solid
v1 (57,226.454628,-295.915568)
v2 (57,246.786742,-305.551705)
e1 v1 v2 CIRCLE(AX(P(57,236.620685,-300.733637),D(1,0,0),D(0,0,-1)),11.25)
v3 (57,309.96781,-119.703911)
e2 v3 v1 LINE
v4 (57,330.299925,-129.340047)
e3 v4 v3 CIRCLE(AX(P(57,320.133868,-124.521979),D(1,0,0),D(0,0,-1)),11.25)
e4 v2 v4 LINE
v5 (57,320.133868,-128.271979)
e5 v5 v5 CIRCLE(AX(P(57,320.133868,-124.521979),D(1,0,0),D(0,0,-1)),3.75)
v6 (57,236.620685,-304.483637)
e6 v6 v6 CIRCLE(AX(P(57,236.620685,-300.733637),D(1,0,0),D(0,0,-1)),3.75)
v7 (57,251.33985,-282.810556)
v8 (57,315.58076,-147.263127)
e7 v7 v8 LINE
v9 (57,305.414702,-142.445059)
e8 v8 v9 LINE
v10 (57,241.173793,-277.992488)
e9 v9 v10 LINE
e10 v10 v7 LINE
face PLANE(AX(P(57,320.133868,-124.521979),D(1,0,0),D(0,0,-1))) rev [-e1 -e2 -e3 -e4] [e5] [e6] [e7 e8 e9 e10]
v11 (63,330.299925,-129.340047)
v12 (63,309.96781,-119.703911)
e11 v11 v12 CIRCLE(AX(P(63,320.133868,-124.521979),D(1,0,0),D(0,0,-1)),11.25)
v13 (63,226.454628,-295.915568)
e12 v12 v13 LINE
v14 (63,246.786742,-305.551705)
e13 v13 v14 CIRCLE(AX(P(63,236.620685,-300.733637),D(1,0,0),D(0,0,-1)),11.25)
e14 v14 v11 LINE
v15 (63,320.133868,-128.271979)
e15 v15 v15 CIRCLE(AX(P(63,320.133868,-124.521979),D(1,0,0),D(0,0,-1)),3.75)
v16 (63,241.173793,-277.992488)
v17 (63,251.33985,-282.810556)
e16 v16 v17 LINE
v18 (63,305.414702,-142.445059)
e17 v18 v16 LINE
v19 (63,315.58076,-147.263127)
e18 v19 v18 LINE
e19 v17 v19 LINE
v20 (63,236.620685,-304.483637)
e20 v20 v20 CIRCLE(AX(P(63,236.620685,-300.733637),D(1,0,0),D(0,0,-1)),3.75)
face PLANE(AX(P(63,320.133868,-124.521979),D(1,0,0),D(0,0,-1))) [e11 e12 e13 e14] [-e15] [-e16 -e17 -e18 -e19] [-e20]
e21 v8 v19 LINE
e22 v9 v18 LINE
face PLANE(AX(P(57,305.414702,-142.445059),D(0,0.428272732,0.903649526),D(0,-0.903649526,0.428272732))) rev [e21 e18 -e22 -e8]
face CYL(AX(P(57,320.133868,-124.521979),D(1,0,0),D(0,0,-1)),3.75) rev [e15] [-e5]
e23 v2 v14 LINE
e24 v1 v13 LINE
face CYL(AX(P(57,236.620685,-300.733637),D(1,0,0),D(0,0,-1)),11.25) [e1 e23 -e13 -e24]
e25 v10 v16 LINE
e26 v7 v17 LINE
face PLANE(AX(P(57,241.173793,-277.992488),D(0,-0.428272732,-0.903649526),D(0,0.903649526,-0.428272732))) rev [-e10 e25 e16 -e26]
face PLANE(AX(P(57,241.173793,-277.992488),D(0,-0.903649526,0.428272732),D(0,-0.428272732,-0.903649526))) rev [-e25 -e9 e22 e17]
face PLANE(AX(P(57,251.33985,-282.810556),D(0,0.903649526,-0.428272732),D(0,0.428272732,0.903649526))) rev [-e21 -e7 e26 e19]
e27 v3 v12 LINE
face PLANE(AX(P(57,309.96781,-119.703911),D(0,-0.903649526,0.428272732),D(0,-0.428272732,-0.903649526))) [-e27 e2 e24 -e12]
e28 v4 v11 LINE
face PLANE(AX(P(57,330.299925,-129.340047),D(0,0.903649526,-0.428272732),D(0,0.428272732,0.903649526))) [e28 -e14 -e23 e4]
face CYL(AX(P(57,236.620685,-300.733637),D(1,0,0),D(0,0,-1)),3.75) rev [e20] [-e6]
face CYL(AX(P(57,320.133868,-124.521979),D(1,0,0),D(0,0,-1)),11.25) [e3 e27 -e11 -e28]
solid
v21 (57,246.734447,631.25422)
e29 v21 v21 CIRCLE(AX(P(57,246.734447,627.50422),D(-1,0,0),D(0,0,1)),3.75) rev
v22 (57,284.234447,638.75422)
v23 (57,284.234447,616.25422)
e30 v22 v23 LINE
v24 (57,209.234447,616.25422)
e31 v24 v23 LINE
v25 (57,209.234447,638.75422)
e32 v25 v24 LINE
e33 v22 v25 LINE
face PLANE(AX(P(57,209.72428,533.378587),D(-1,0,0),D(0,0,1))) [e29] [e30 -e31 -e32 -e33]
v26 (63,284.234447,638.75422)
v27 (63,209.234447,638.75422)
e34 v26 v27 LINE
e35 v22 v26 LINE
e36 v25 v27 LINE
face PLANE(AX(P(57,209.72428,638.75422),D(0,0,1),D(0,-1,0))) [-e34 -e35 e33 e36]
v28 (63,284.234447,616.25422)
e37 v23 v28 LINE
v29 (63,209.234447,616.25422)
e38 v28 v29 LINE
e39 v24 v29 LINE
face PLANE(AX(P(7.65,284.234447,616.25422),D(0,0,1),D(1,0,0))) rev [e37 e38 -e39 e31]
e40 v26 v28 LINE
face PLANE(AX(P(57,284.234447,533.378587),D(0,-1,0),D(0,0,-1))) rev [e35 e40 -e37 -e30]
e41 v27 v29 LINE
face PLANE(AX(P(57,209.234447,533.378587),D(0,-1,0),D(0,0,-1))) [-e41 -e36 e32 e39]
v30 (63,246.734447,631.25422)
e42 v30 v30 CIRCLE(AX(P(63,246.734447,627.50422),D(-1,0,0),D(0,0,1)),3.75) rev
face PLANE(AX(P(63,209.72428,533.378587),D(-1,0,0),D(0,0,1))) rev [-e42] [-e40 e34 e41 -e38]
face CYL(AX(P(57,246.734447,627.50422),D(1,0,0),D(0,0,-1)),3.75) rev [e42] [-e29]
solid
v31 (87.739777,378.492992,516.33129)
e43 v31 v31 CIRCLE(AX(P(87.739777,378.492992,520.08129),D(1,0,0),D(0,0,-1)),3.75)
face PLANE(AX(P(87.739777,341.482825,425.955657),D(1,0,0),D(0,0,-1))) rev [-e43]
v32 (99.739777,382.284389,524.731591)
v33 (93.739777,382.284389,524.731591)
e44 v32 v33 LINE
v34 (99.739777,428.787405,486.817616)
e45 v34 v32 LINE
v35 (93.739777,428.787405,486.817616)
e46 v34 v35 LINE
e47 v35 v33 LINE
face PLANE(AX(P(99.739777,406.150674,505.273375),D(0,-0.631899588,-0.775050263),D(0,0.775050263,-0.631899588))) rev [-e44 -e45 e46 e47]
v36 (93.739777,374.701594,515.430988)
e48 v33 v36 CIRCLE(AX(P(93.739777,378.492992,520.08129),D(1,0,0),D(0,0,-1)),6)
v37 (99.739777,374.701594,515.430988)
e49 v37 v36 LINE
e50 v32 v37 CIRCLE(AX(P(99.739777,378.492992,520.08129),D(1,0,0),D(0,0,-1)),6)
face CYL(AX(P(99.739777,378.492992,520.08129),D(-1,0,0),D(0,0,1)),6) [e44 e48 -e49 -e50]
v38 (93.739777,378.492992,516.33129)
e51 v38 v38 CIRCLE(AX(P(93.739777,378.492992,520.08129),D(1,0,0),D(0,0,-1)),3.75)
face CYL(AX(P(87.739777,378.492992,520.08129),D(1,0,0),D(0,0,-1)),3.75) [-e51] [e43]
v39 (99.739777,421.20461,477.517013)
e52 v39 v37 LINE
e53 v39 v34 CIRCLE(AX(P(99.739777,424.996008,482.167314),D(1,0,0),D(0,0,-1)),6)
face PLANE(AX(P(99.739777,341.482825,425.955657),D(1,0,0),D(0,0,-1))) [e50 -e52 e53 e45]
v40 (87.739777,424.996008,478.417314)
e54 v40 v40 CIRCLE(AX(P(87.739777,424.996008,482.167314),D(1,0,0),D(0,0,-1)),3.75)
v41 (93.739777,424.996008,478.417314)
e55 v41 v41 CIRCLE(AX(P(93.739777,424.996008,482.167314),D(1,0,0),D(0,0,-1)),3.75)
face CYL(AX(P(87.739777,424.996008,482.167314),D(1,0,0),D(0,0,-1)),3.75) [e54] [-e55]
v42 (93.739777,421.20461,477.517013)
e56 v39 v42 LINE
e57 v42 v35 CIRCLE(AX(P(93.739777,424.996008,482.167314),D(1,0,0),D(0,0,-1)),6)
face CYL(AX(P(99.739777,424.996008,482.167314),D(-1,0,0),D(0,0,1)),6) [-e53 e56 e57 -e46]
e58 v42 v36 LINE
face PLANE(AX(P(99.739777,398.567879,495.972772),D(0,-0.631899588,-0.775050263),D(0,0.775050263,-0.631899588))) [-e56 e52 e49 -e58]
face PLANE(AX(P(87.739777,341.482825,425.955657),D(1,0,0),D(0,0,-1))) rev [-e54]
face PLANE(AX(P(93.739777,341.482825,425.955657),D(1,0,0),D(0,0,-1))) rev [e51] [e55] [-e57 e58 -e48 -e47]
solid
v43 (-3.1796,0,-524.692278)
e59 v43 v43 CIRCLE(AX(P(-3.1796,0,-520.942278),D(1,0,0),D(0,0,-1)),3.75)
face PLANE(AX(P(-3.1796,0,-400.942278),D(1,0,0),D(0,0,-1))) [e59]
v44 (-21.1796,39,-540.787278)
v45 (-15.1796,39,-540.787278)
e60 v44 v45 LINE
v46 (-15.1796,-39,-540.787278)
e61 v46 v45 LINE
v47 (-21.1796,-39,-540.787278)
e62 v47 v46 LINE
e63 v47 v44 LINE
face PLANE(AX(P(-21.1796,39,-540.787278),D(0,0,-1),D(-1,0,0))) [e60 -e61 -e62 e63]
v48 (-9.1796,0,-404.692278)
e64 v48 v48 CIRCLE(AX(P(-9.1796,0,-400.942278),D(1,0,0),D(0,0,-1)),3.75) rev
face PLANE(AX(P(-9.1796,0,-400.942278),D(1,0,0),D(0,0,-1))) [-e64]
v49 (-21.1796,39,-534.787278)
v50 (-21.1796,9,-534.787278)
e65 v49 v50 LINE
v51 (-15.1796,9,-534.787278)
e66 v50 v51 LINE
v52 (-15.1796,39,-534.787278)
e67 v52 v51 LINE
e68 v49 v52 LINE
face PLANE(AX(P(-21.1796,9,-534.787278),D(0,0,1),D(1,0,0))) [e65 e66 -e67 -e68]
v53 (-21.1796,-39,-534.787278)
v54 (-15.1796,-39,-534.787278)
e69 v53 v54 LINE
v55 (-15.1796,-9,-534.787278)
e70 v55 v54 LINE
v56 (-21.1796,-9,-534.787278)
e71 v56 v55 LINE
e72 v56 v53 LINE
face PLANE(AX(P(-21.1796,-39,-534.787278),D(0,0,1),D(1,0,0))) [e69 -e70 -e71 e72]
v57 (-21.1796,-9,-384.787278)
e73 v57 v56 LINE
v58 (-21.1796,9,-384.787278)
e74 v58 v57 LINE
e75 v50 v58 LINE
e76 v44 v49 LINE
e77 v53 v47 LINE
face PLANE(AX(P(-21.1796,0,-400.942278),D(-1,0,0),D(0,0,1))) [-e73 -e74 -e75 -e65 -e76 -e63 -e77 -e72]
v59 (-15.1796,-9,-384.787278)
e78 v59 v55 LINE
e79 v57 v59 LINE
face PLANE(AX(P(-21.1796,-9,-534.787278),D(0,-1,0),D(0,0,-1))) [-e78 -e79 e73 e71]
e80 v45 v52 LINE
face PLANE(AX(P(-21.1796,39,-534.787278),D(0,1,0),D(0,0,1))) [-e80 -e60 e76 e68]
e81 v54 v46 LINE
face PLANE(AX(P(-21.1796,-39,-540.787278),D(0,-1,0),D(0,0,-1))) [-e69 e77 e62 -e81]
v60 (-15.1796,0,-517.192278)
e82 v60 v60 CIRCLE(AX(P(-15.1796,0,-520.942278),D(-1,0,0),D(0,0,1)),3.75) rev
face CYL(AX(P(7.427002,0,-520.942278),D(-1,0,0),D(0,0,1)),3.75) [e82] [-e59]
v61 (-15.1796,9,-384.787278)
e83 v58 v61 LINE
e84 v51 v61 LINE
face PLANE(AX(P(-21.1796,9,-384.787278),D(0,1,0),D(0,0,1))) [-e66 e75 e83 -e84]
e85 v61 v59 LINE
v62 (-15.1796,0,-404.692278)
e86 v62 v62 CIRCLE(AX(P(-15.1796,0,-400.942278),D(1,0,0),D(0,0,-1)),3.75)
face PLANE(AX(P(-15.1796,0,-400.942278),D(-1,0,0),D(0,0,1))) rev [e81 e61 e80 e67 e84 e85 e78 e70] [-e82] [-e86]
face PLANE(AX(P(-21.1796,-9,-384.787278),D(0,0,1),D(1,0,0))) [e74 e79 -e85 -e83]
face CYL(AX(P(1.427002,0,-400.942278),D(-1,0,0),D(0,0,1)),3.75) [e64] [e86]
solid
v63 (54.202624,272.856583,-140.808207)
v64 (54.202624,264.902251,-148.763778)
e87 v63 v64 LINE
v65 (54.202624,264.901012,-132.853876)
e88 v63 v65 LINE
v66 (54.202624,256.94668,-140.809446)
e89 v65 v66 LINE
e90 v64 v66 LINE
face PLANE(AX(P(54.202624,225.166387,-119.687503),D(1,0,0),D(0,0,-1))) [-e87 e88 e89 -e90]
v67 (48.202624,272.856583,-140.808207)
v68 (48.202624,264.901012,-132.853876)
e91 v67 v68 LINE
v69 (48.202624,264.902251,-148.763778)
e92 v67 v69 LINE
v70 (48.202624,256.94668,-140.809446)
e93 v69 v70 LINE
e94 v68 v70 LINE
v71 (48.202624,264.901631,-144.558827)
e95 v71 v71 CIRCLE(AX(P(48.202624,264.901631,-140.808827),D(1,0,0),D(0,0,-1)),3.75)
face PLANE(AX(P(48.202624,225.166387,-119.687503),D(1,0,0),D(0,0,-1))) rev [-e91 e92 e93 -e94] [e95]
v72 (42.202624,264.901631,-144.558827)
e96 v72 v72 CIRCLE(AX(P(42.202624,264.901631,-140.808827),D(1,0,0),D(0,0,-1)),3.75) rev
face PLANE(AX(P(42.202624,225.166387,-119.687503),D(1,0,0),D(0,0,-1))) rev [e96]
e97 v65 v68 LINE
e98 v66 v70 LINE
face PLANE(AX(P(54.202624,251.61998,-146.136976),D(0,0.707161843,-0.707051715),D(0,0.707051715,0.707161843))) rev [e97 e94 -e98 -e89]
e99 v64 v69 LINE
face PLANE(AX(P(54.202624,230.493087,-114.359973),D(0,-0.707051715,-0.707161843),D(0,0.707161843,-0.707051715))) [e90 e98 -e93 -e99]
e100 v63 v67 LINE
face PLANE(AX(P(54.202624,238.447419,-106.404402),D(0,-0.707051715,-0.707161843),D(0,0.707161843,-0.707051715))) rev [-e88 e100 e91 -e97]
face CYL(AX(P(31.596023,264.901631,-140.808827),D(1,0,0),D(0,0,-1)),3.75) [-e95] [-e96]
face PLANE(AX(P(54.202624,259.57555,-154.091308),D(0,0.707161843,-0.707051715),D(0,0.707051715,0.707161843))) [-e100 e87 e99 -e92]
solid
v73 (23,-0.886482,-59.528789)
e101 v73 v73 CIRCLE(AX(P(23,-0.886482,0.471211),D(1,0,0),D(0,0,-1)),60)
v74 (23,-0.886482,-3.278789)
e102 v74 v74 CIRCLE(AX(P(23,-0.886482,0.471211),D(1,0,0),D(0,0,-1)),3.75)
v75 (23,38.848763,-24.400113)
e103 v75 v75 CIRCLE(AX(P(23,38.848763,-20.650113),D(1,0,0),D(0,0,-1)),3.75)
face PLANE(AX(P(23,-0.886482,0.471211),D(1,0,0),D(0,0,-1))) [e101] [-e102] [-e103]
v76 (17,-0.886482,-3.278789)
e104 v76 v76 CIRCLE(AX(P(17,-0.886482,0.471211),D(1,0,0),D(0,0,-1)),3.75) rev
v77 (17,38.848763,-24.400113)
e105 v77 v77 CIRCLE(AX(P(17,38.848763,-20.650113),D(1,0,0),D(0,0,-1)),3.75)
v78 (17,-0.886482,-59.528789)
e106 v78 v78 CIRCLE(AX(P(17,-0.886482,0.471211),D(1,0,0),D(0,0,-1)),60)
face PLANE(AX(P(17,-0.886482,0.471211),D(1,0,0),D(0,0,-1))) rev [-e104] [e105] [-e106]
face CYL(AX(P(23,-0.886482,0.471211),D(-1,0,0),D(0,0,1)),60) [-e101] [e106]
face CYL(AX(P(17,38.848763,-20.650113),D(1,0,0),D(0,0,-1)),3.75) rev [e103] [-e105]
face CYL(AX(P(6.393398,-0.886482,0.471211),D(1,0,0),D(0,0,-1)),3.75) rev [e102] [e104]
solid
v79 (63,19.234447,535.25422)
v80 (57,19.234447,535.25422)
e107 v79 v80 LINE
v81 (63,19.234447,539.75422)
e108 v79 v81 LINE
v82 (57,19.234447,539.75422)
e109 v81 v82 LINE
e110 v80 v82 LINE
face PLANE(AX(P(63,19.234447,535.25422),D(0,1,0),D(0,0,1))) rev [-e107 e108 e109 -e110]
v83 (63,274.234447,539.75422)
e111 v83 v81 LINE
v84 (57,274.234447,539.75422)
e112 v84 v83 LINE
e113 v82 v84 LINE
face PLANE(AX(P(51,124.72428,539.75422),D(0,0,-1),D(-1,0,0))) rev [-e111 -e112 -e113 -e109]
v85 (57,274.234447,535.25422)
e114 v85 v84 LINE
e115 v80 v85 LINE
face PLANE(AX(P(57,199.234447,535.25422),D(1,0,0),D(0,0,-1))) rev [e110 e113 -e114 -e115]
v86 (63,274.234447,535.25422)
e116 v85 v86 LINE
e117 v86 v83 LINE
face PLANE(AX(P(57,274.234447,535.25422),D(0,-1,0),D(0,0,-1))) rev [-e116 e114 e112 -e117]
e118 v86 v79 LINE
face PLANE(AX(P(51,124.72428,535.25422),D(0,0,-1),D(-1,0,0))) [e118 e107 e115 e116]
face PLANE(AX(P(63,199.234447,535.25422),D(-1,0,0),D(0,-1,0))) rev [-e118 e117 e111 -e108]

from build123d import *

# Parameters (mm, degrees)
SKETCH5_R            = 400
BOSS_EXTRUDE6_DEPTH  = 40
SKETCH6_R            = 25
CUT_EXTRUDE2_DEPTH   = 40
SKETCH8_R            = 25
BOSS_EXTRUDE7_DEPTH  = 40
BOSS_EXTRUDE8_START  = -40
SKETCH8_3_R          = 25
BOSS_EXTRUDE8_DEPTH  = 80
SKETCH9_R            = 25
CUT_EXTRUDE3_DEPTH   = 40
SKETCH9_4_R          = 25
BOSS_EXTRUDE9_DEPTH  = 40
BOSS_EXTRUDE10_START = 40
SKETCH9_5_R          = 25
BOSS_EXTRUDE10_DEPTH = 80
SKETCH10_R           = 25
BOSS_EXTRUDE11_DEPTH = 80
SKETCH12_R           = 25
BOSS_EXTRUDE12_DEPTH = 40
BOSS_EXTRUDE13_DEPTH = 40
SKETCH13_3_R         = 25
BOSS_EXTRUDE14_DEPTH = 40
SKETCH14_W           = 20
SKETCH14_H           = 2000
SKETCH14_W_2         = 150
SKETCH14_H_2         = 500
SKETCH14_R           = 25
BOSS_EXTRUDE15_DEPTH = 40
CUT_EXTRUDE4_DEPTH   = 369
BOSS_EXTRUDE16_DEPTH = 30
SCALE1_START         = -40
SCALE1_OUTLINE_R     = 60
SCALE1_OUTLINE_W     = 255
SCALE1_OUTLINE_H     = 4.5
SCALE1_OUTLINE_W_2   = 75
SCALE1_OUTLINE_H_2   = 22.5
SCALE1_OUTLINE_R_2   = 3.75
SCALE1_DEPTH         = 160
SCALE1_2_OUTLINE_R   = 60
SCALE1_2_OUTLINE_R_2 = 3.75
SCALE1_2_DEPTH       = 57
SCALE1_START_2       = 23
SCALE1_3_OUTLINE_R   = 60
SCALE1_3_OUTLINE_R_2 = 3.75
SCALE1_3_OUTLINE_W   = 255
SCALE1_3_OUTLINE_H   = 4.5
SCALE1_3_OUTLINE_W_2 = 75
SCALE1_3_OUTLINE_H_2 = 22.5
SCALE1_3_DEPTH       = 34
SCALE1_START_3       = 63
SCALE1_4_OUTLINE_W   = 255
SCALE1_4_OUTLINE_H   = 4.5
SCALE1_4_OUTLINE_W_2 = 75
SCALE1_4_OUTLINE_H_2 = 22.5
SCALE1_4_OUTLINE_R   = 3.75
SCALE1_4_DEPTH       = 57
SCALE1_START_4       = -15.179599902
SCALE1_5_OUTLINE_R   = 3.75
SCALE1_5_DEPTH       = 57.382224362
SCALE1_6_DEPTH       = 18.820400098
SCALE1_START_5       = 99.739776566
SCALE1_7_DEPTH       = 20.260223434
SCALE1_START_6       = 54.20262446
SCALE1_8_OUTLINE_R   = 3.75
SCALE1_8_DEPTH       = 39.537152106
SCALE1_START_7       = -9.179599902
SCALE1_9_OUTLINE_R   = 3.75
SCALE1_9_DEPTH       = 96.919376468
SCALE1_START_8       = -3.179599902
SCALE1_10_OUTLINE_R  = 3.75
SCALE1_10_DEPTH      = 51.382224362
SCALE1_START_9       = 57
SCALE1_11_OUTLINE_R  = 3.75
SCALE1_11_DEPTH      = 6


# Read off the part's stored shape, not the designer's step: Scale1
with BuildPart() as part:
    # Sketch5 → Boss-Extrude6 (new body)
    with BuildSketch(Plane(origin=(0, 0, 0), x_dir=(0, 0, -1), z_dir=(1, 0, 0))):
        Circle(SKETCH5_R)
    extrude(amount=BOSS_EXTRUDE6_DEPTH)

    # Sketch6 → Cut-Extrude2 (cut)
    with BuildSketch(Plane(origin=(40, 0, 0), x_dir=(0, 0, -1), z_dir=(1, 0, 0))):
        Circle(SKETCH6_R)
    extrude(amount=-CUT_EXTRUDE2_DEPTH, mode=Mode.SUBTRACT)

    # Sketch9 → Cut-Extrude3 (cut)
    with BuildSketch(Plane(origin=(40, 0, 0), x_dir=(0, 0, -1), z_dir=(1, 0, 0))):
        with Locations((140.808826922, 264.901631291)):
            Circle(SKETCH9_R)
    extrude(amount=-CUT_EXTRUDE3_DEPTH, mode=Mode.SUBTRACT)


with BuildPart() as body_2:
    # Sketch8 → Boss-Extrude7 (new body)
    with BuildSketch(Plane(origin=(0, 0, 0), x_dir=(0, 0, -1), z_dir=(1, 0, 0))):
        Polygon((-107.7, 60), (892.3, 60), (892.3, 260), (932.3, 260), (932.3, -260), (892.3, -260), (892.3, -60), (-107.7, -60), align=None)
        Circle(SKETCH8_R, mode=Mode.SUBTRACT)
    extrude(amount=-BOSS_EXTRUDE7_DEPTH)


with BuildPart() as body_3:
    # Sketch8<3> → Boss-Extrude8 (new body)
    with BuildSketch(Plane(origin=(0, 0, 0), x_dir=(0, 0, -1), z_dir=(1, 0, 0)).offset(BOSS_EXTRUDE8_START)):
        Circle(SKETCH8_3_R)
    extrude(amount=BOSS_EXTRUDE8_DEPTH)

    # Combine2: union body 2
    add(body_2.part)

    # Sketch10 → Boss-Extrude11 (add)
    with BuildSketch(Plane(origin=(0, 0, 0), x_dir=(0, 0, -1), z_dir=(1, 0, 0))):
        with Locations(Location((800, 0, 0), (0, 0, 180))):
            Circle(SKETCH10_R)
    extrude(amount=BOSS_EXTRUDE11_DEPTH)


with BuildPart() as body_3_2:
    # Sketch9<4> → Boss-Extrude9 (new body)
    with BuildSketch(Plane(origin=(40, 0, 0), x_dir=(0, 0, -1), z_dir=(1, 0, 0))):
        Polygon((193.84183535, 264.905761095), (140.812956726, 211.868622863), (87.775818494, 264.897501488), (140.804697119, 317.934639719), align=None)
        with Locations((140.808826922, 264.901631291)):
            Circle(SKETCH9_4_R, mode=Mode.SUBTRACT)
    extrude(amount=BOSS_EXTRUDE9_DEPTH)

    # Sketch9<5> → Boss-Extrude10 (add)
    with BuildSketch(Plane(origin=(40, 0, 0), x_dir=(0, 0, -1), z_dir=(1, 0, 0)).offset(BOSS_EXTRUDE10_START)):
        with Locations((140.808826922, 264.901631291)):
            Circle(SKETCH9_5_R)
    extrude(amount=-BOSS_EXTRUDE10_DEPTH)


with BuildPart() as body_4:
    # Sketch12 → Boss-Extrude12 (new body)
    with BuildSketch(Plane(origin=(80, 0, 0), x_dir=(0, 0, -1), z_dir=(1, 0, 0))):
        with BuildLine():
            Line((-342.623929428, 624.528266693), (832.120454935, 67.773714482))
            ThreePointArc((832.120454935, 67.773714482), (867.773714482, -32.120454935), (767.879545065, -67.773714482))
            Line((767.879545065, -67.773714482), (-406.864839299, 488.980837728))
            ThreePointArc((-406.864839299, 488.980837728), (-442.518098846, 588.875007145), (-342.623929428, 624.528266693))
        make_face()
        with Locations((-374.744384363, 556.75455221)):
            Circle(SKETCH12_R, mode=Mode.SUBTRACT)
        with Locations(Location((800, 0, 0), (0, 0, 180))):
            Circle(SKETCH12_R, mode=Mode.SUBTRACT)
        Polygon((648.392343567, 30.354052629), (-255.257182866, 458.626785099), (-223.136727931, 526.400499581), (680.512798503, 98.127767112), align=None, mode=Mode.SUBTRACT)
    extrude(amount=-BOSS_EXTRUDE12_DEPTH)


with BuildPart() as body_5:
    # Sketch13 → Boss-Extrude13 (new body)
    with BuildSketch(Plane(origin=(80, 0, 0), x_dir=(0, 0, -1), z_dir=(1, 0, 0))):
        with BuildLine():
            Line((-343.742373844, 531.478568673), (-596.502209216, 221.458463482))
            ThreePointArc((-596.502209216, 221.458463482), (-652.780203272, 215.7324365), (-658.506230254, 272.010430556))
            Line((-658.506230254, 272.010430556), (-405.746394882, 582.030535747))
            ThreePointArc((-405.746394882, 582.030535747), (-349.468400826, 587.756562729), (-343.742373844, 531.478568673))
        make_face()
    extrude(amount=BOSS_EXTRUDE13_DEPTH)

    # Sketch13<3> → Boss-Extrude14 (add)
    with BuildSketch(Plane(origin=(80, 0, 0), x_dir=(0, 0, -1), z_dir=(1, 0, 0))):
        with Locations((-374.744384363, 556.75455221)):
            Circle(SKETCH13_3_R)
        with Locations((-627.504219735, 246.734447019)):
            Circle(SKETCH13_3_R)
    extrude(amount=-BOSS_EXTRUDE14_DEPTH)


with BuildPart() as body_6:
    # Sketch14 → Boss-Extrude15 (new body)
    # profile 1 of 2: a face of its own
    with BuildSketch(Plane.ZY.offset(-80)):
        with Locations((542.504219735, -3.265552981)):
            Rectangle(SKETCH14_W, SKETCH14_H)
    # profile 2 of 2: a face of its own
    with BuildSketch(Plane.ZY.offset(-80)):
        with Locations((627.504219735, 246.734447019)):
            Rectangle(SKETCH14_W_2, SKETCH14_H_2)
        with Locations(Location((627.504219735, 246.734447019, 0), (0, 0, 180))):
            Circle(SKETCH14_R, mode=Mode.SUBTRACT)
    extrude(amount=BOSS_EXTRUDE15_DEPTH)

    # Sketch15 → Cut-Extrude4 (cut)
    with BuildSketch(Plane(origin=(80, 0, 0), x_dir=(0, 0, -1), z_dir=(1, 0, 0))):
        Polygon((-552.504219735, 496.734447019), (-552.504219735, -3.265552981), (-552.504219735, -1003.265552981), (-532.504219735, -1003.265552981), (-532.504219735, 996.734447019), (-552.504219735, 996.734447019), align=None)
    extrude(amount=-CUT_EXTRUDE4_DEPTH, mode=Mode.SUBTRACT)


with BuildPart() as body_7:
    # Sketch16 → Boss-Extrude16 (new body)
    with BuildSketch(Plane(origin=(0, 0, 552.504219735), x_dir=(-1, 0, 0), z_dir=(0, 0, -1))):
        Polygon((-80, 496.734447019), (-80, 996.734447019), (-40, 996.734447019), (-40, 496.734447019), (-40, -3.265552981), (-40, -703.265552981), (-80, -703.265552981), (-80, -3.265552981), align=None)
    extrude(amount=BOSS_EXTRUDE16_DEPTH)


with BuildPart() as scale1_tool:
    # Scale1 outline → Scale1 (new body)
    # profile 1 of 7: a face of its own
    with BuildSketch(Plane.YZ.offset(SCALE1_START)):
        with BuildLine():
            Line((-60, -395.474398666), (-60, -751.47711531))
            Line((-60, -751.47711531), (-67.773714482, -767.879545065))
            ThreePointArc((-67.773714482, -767.879545065), (-74.62185786, -807.521856784), (-60, -844.999999999))
            Line((-60, -844.999999999), (-60, -892.3))
            Line((-60, -892.3), (-260, -892.3))
            Line((-260, -892.3), (-260, -932.3))
            Line((-260, -932.3), (260, -932.3))
            Line((260, -932.3), (260, -892.3))
            Line((260, -892.3), (60, -892.3))
            Line((60, -892.3), (60, -844.999999999))
            ThreePointArc((60, -844.999999999), (64.210600358, -838.755629288), (67.773714482, -832.120454935))
            Line((67.773714482, -832.120454935), (624.528266693, 342.623929428))
            ThreePointArc((624.528266693, 342.623929428), (612.830437505, 424.548953315), (532.859108949, 445.83592951))
            Line((532.859108949, 445.83592951), (438.822367054, 522.504219735))
            Line((438.822367054, 522.504219735), (996.734447019, 522.504219735))
            Line((996.734447019, 522.504219735), (996.734447019, 552.504219735))
            Line((996.734447019, 552.504219735), (496.734447019, 552.504219735))
            Line((496.734447019, 552.504219735), (496.734447019, 702.504219735))
            Line((496.734447019, 702.504219735), (-3.265552981, 702.504219735))
            Line((-3.265552981, 702.504219735), (-3.265552981, 552.504219735))
            Line((-3.265552981, 552.504219735), (-703.265552981, 552.504219735))
            Line((-703.265552981, 552.504219735), (-703.265552981, 522.504219735))
            Line((-703.265552981, 522.504219735), (312.219974104, 522.504219735))
            Line((312.219974104, 522.504219735), (479.247092245, 386.326771314))
            Line((479.247092245, 386.326771314), (369.153644363, 154.031123003))
            ThreePointArc((369.153644363, 154.031123003), (-315.250810533, 246.205049619), (-60, -395.474398666))
        make_face()
        with BuildLine():
            Line((60, -498.278779411), (60, -395.474398666))
            ThreePointArc((60, -395.474398666), (87.469750454, -390.319154994), (114.512449681, -383.258266536))
            Line((114.512449681, -383.258266536), (60, -498.278779411))
        make_face(mode=Mode.SUBTRACT)
        Polygon((-9, -534.787278323), (-9, -384.787278323), (9, -384.787278323), (9, -534.787278323), (39, -534.787278323), (39, -540.787278323), (-39, -540.787278323), (-39, -534.787278323), align=None, mode=Mode.SUBTRACT)
        with Locations((-0.886481837, 0.471210641)):
            Circle(SCALE1_OUTLINE_R, mode=Mode.SUBTRACT)
        with BuildLine():
            Line((60, -585.83980573), (164.944620313, -364.40811219))
            ThreePointArc((164.944620313, -364.40811219), (231.868078939, -325.940476114), (290.156613301, -275.334596006))
            Line((290.156613301, -275.334596006), (98.127767112, -680.512798503))
            Line((98.127767112, -680.512798503), (60, -662.442647934))
            Line((60, -662.442647934), (60, -585.83980573))
        make_face(mode=Mode.SUBTRACT)
        with BuildLine():
            Line((526.400499581, 223.136727931), (396.83062419, -50.253912332))
            ThreePointArc((396.83062419, -50.253912332), (399.094174855, 26.90426726), (386.495188213, 103.060513722))
            Line((386.495188213, 103.060513722), (458.626785099, 255.257182866))
            Line((458.626785099, 255.257182866), (526.400499581, 223.136727931))
        make_face(mode=Mode.SUBTRACT)
        with BuildLine():
            Line((226.454627517, -295.915568405), (309.967810349, -119.703910751))
            ThreePointArc((309.967810349, -119.703910751), (324.951935761, -114.355921819), (330.299924693, -129.340047231))
            Line((330.299924693, -129.340047231), (246.786741862, -305.551704886))
            ThreePointArc((246.786741862, -305.551704886), (231.802616449, -310.899693818), (226.454627517, -295.915568405))
        make_face(mode=Mode.SUBTRACT)
        with BuildLine():
            ThreePointArc((374.701594195, 515.430988124), (373.842690147, 523.872687233), (382.284389256, 524.73159128))
            Line((382.284389256, 524.73159128), (428.787405034, 486.817615974))
            ThreePointArc((428.787405034, 486.817615974), (429.646309082, 478.375916865), (421.204609973, 477.517012818))
            Line((421.204609973, 477.517012818), (374.701594195, 515.430988124))
        make_face(mode=Mode.SUBTRACT)
        Polygon((264.901011821, -132.853875658), (272.856582556, -140.808207452), (264.902250762, -148.763778186), (256.946680027, -140.809446393), align=None, mode=Mode.SUBTRACT)
        with Locations((146.734447019, 537.504219735)):
            Rectangle(SCALE1_OUTLINE_W, SCALE1_OUTLINE_H, mode=Mode.SUBTRACT)
        with Locations((246.734447019, 627.504219735)):
            Rectangle(SCALE1_OUTLINE_W_2, SCALE1_OUTLINE_H_2, mode=Mode.SUBTRACT)
    # profile 2 of 7: a face of its own
    with BuildSketch(Plane.YZ.offset(SCALE1_START)):
        Polygon((315.580759627, -147.263127456), (305.414702454, -142.445059216), (241.173792584, -277.992488181), (251.339849756, -282.810556421), align=None)
    # profile 3 of 7: a face of its own
    with BuildSketch(Plane.YZ.offset(SCALE1_START)):
        with Locations((-0.886481837, 0.471210641)):
            Circle(SCALE1_OUTLINE_R_2)
    # profile 4 of 7: a face of its own
    with BuildSketch(Plane.YZ.offset(SCALE1_START)):
        with Locations((38.848762857, -20.650113397)):
            Circle(SCALE1_OUTLINE_R_2)
    # profile 5 of 7: a face of its own
    with BuildSketch(Plane.YZ.offset(SCALE1_START)):
        with Locations((320.133867521, -124.521978991)):
            Circle(SCALE1_OUTLINE_R_2)
    # profile 6 of 7: a face of its own
    with BuildSketch(Plane.YZ.offset(SCALE1_START)):
        with Locations((236.620684689, -300.733636646)):
            Circle(SCALE1_OUTLINE_R_2)
    # profile 7 of 7: a face of its own
    with BuildSketch(Plane.YZ.offset(SCALE1_START)):
        with Locations((246.734447019, 627.504219735)):
            Circle(SCALE1_OUTLINE_R_2)
    extrude(amount=SCALE1_DEPTH)


with BuildPart() as part_1:
    add(part.part)

    # Scale1: cut by scale1_tool
    add(scale1_tool.part, mode=Mode.SUBTRACT)


with BuildPart() as body_3_1:
    add(body_3.part)

    # Scale1: cut by scale1_tool
    add(scale1_tool.part, mode=Mode.SUBTRACT)


with BuildPart() as body_3_2_1:
    add(body_3_2.part)

    # Scale1: cut by scale1_tool
    add(scale1_tool.part, mode=Mode.SUBTRACT)


with BuildPart() as body_4_1:
    add(body_4.part)

    # Scale1: cut by scale1_tool
    add(scale1_tool.part, mode=Mode.SUBTRACT)


with BuildPart() as body_5_1:
    add(body_5.part)

    # Scale1: cut by scale1_tool
    add(scale1_tool.part, mode=Mode.SUBTRACT)


with BuildPart() as body_6_1:
    add(body_6.part)

    # Scale1: cut by scale1_tool
    add(scale1_tool.part, mode=Mode.SUBTRACT)


with BuildPart() as body_7_1:
    add(body_7.part)

    # Scale1: cut by scale1_tool
    add(scale1_tool.part, mode=Mode.SUBTRACT)


with BuildPart() as scale1_2_tool:
    # Scale1 2 outline → Scale1 2 (new body)
    # profile 1 of 3: a face of its own
    with BuildSketch(Plane.YZ.offset(SCALE1_START)):
        with Locations((-0.886481837, 0.471210641)):
            Circle(SCALE1_2_OUTLINE_R)
        with Locations((38.848762857, -20.650113397)):
            Circle(SCALE1_2_OUTLINE_R_2, mode=Mode.SUBTRACT)
        with Locations((-0.886481837, 0.471210641)):
            Circle(SCALE1_2_OUTLINE_R_2, mode=Mode.SUBTRACT)
    # profile 2 of 3: a face of its own
    with BuildSketch(Plane.YZ.offset(SCALE1_START)):
        with BuildLine():
            ThreePointArc((226.454627517, -295.915568405), (231.802616449, -310.899693818), (246.786741862, -305.551704886))
            Line((246.786741862, -305.551704886), (330.299924693, -129.340047231))
            ThreePointArc((330.299924693, -129.340047231), (324.951935761, -114.355921819), (309.967810349, -119.703910751))
            Line((309.967810349, -119.703910751), (226.454627517, -295.915568405))
        make_face()
        Polygon((305.414702454, -142.445059216), (315.580759627, -147.263127456), (251.339849756, -282.810556421), (241.173792584, -277.992488181), align=None, mode=Mode.SUBTRACT)
        with Locations((320.133867521, -124.521978991)):
            Circle(SCALE1_2_OUTLINE_R_2, mode=Mode.SUBTRACT)
        with Locations((236.620684689, -300.733636646)):
            Circle(SCALE1_2_OUTLINE_R_2, mode=Mode.SUBTRACT)
    # profile 3 of 3: a face of its own
    with BuildSketch(Plane.YZ.offset(SCALE1_START)):
        Polygon((272.856582556, -140.808207452), (264.901011821, -132.853875658), (256.946680027, -140.809446393), (264.902250762, -148.763778186), align=None)
    extrude(amount=SCALE1_2_DEPTH)


with BuildPart() as part_2:
    add(part_1.part)

    # Scale1 2: cut by scale1_2_tool
    add(scale1_2_tool.part, mode=Mode.SUBTRACT)


with BuildPart() as body_3_3:
    add(body_3_1.part)

    # Scale1 2: cut by scale1_2_tool
    add(scale1_2_tool.part, mode=Mode.SUBTRACT)


with BuildPart() as body_3_2_2:
    add(body_3_2_1.part)

    # Scale1 2: cut by scale1_2_tool
    add(scale1_2_tool.part, mode=Mode.SUBTRACT)


with BuildPart() as scale1_3_tool:
    # Scale1 3 outline → Scale1 3 (new body)
    # profile 1 of 6: a face of its own
    with BuildSketch(Plane.YZ.offset(SCALE1_START_2)):
        with BuildLine():
            Line((9, -399.898737182), (9, -384.787278323))
            Line((9, -384.787278323), (-9, -384.787278323))
            Line((-9, -384.787278323), (-9, -399.898737182))
            ThreePointArc((-9, -399.898737182), (0, -400), (9, -399.898737182))
        make_face()
    # profile 2 of 6: a face of its own
    with BuildSketch(Plane.YZ.offset(SCALE1_START_2)):
        with Locations((-0.886481837, 0.471210641)):
            Circle(SCALE1_3_OUTLINE_R)
        with Locations((38.848762857, -20.650113397)):
            Circle(SCALE1_3_OUTLINE_R_2, mode=Mode.SUBTRACT)
        with Locations((-0.886481837, 0.471210641)):
            Circle(SCALE1_3_OUTLINE_R_2, mode=Mode.SUBTRACT)
    # profile 3 of 6: a face of its own
    with BuildSketch(Plane.YZ.offset(SCALE1_START_2)):
        with BuildLine():
            ThreePointArc((226.454627517, -295.915568405), (231.802616449, -310.899693818), (246.786741862, -305.551704886))
            Line((246.786741862, -305.551704886), (330.299924693, -129.340047231))
            ThreePointArc((330.299924693, -129.340047231), (324.951935761, -114.355921819), (309.967810349, -119.703910751))
            Line((309.967810349, -119.703910751), (226.454627517, -295.915568405))
        make_face()
        Polygon((305.414702454, -142.445059216), (315.580759627, -147.263127456), (251.339849756, -282.810556421), (241.173792584, -277.992488181), align=None, mode=Mode.SUBTRACT)
        with Locations((320.133867521, -124.521978991)):
            Circle(SCALE1_3_OUTLINE_R_2, mode=Mode.SUBTRACT)
        with Locations((236.620684689, -300.733636646)):
            Circle(SCALE1_3_OUTLINE_R_2, mode=Mode.SUBTRACT)
    # profile 4 of 6: a face of its own
    with BuildSketch(Plane.YZ.offset(SCALE1_START_2)):
        with BuildLine():
            ThreePointArc((382.284389256, 524.73159128), (377.092712508, 525.915603554), (373.003965394, 522.504219735))
            Line((373.003965394, 522.504219735), (385.016350051, 522.504219735))
            Line((385.016350051, 522.504219735), (382.284389256, 524.73159128))
        make_face()
    # profile 5 of 6: a face of its own
    with BuildSketch(Plane.YZ.offset(SCALE1_START_2)):
        with Locations((146.734447019, 537.504219735)):
            Rectangle(SCALE1_3_OUTLINE_W, SCALE1_3_OUTLINE_H)
    # profile 6 of 6: a face of its own
    with BuildSketch(Plane.YZ.offset(SCALE1_START_2)):
        with Locations((246.734447019, 627.504219735)):
            Rectangle(SCALE1_3_OUTLINE_W_2, SCALE1_3_OUTLINE_H_2)
        with Locations((246.734447019, 627.504219735)):
            Circle(SCALE1_3_OUTLINE_R_2, mode=Mode.SUBTRACT)
    extrude(amount=SCALE1_3_DEPTH)


with BuildPart() as part_3:
    add(part_2.part)

    # Scale1 3: cut by scale1_3_tool
    add(scale1_3_tool.part, mode=Mode.SUBTRACT)


with BuildPart() as body_3_4:
    add(body_3_3.part)

    # Scale1 3: cut by scale1_3_tool
    add(scale1_3_tool.part, mode=Mode.SUBTRACT)


with BuildPart() as body_3_2_3:
    add(body_3_2_2.part)

    # Scale1 3: cut by scale1_3_tool
    add(scale1_3_tool.part, mode=Mode.SUBTRACT)


with BuildPart() as body_5_2:
    add(body_5_1.part)

    # Scale1 3: cut by scale1_3_tool
    add(scale1_3_tool.part, mode=Mode.SUBTRACT)


with BuildPart() as body_6_2:
    add(body_6_1.part)

    # Scale1 3: cut by scale1_3_tool
    add(scale1_3_tool.part, mode=Mode.SUBTRACT)


with BuildPart() as body_7_2:
    add(body_7_1.part)

    # Scale1 3: cut by scale1_3_tool
    add(scale1_3_tool.part, mode=Mode.SUBTRACT)


with BuildPart() as scale1_4_tool:
    # Scale1 4 outline → Scale1 4 (new body)
    # profile 1 of 4: a face of its own
    with BuildSketch(Plane.YZ.offset(SCALE1_START_3)):
        Polygon((317.934639719, -140.804697119), (305.744043776, -128.615999648), (283.77564868, -174.969008652), (295.61002827, -163.132785777), (305.414702454, -142.445059216), (312.796549305, -145.943587825), align=None)
    # profile 2 of 4: a face of its own
    with BuildSketch(Plane.YZ.offset(SCALE1_START_3)):
        Polygon((272.856582556, -140.808207452), (264.901011821, -132.853875658), (256.946680027, -140.809446393), (264.902250762, -148.763778186), align=None)
    # profile 3 of 4: a face of its own
    with BuildSketch(Plane.YZ.offset(SCALE1_START_3)):
        with Locations((146.734447019, 537.504219735)):
            Rectangle(SCALE1_4_OUTLINE_W, SCALE1_4_OUTLINE_H)
    # profile 4 of 4: a face of its own
    with BuildSketch(Plane.YZ.offset(SCALE1_START_3)):
        with Locations((246.734447019, 627.504219735)):
            Rectangle(SCALE1_4_OUTLINE_W_2, SCALE1_4_OUTLINE_H_2)
        with Locations((246.734447019, 627.504219735)):
            Circle(SCALE1_4_OUTLINE_R, mode=Mode.SUBTRACT)
    extrude(amount=SCALE1_4_DEPTH)


with BuildPart() as body_3_2_4:
    add(body_3_2_3.part)

    # Scale1 4: cut by scale1_4_tool
    add(scale1_4_tool.part, mode=Mode.SUBTRACT)


with BuildPart() as body_4_2:
    add(body_4_1.part)

    # Scale1 4: cut by scale1_4_tool
    add(scale1_4_tool.part, mode=Mode.SUBTRACT)


with BuildPart() as body_5_3:
    add(body_5_2.part)

    # Scale1 4: cut by scale1_4_tool
    add(scale1_4_tool.part, mode=Mode.SUBTRACT)

    # Scale1 7 outline → Scale1 7 (cut)
    with BuildSketch(Plane.YZ.offset(SCALE1_START_5)):
        with BuildLine():
            Line((428.787405034, 486.817615974), (382.284389256, 524.73159128))
            ThreePointArc((382.284389256, 524.73159128), (373.842690147, 523.872687233), (374.701594195, 515.430988124))
            Line((374.701594195, 515.430988124), (421.204609973, 477.517012818))
            ThreePointArc((421.204609973, 477.517012818), (429.646309082, 478.375916865), (428.787405034, 486.817615974))
        make_face()
    extrude(amount=SCALE1_7_DEPTH, mode=Mode.SUBTRACT)


with BuildPart() as body_6_3:
    add(body_6_2.part)

    # Scale1 4: cut by scale1_4_tool
    add(scale1_4_tool.part, mode=Mode.SUBTRACT)



with BuildPart() as body_7_3:
    add(body_7_2.part)

    # Scale1 4: cut by scale1_4_tool
    add(scale1_4_tool.part, mode=Mode.SUBTRACT)


with BuildPart() as scale1_5_tool:
    # Scale1 5 outline → Scale1 5 (new body)
    # profile 1 of 3: a face of its own
    with BuildSketch(Plane.YZ.offset(SCALE1_START_4)):
        Polygon((9, -534.787278323), (9, -384.787278323), (-9, -384.787278323), (-9, -534.787278323), (-39, -534.787278323), (-39, -540.787278323), (39, -540.787278323), (39, -534.787278323), align=None)
        with Locations((0, -400.942278323)):
            Circle(SCALE1_5_OUTLINE_R, mode=Mode.SUBTRACT)
        with Locations((0, -520.942278323)):
            Circle(SCALE1_5_OUTLINE_R, mode=Mode.SUBTRACT)
    # profile 2 of 3: a face of its own
    with BuildSketch(Plane.YZ.offset(SCALE1_START_4)):
        with BuildLine():
            ThreePointArc((226.454627517, -295.915568405), (231.802616449, -310.899693818), (246.786741862, -305.551704886))
            Line((246.786741862, -305.551704886), (330.299924693, -129.340047231))
            ThreePointArc((330.299924693, -129.340047231), (324.951935761, -114.355921819), (309.967810349, -119.703910751))
            Line((309.967810349, -119.703910751), (226.454627517, -295.915568405))
        make_face()
        Polygon((305.414702454, -142.445059216), (315.580759627, -147.263127456), (251.339849756, -282.810556421), (241.173792584, -277.992488181), align=None, mode=Mode.SUBTRACT)
        with Locations((320.133867521, -124.521978991)):
            Circle(SCALE1_5_OUTLINE_R, mode=Mode.SUBTRACT)
        with Locations((236.620684689, -300.733636646)):
            Circle(SCALE1_5_OUTLINE_R, mode=Mode.SUBTRACT)
    # profile 3 of 3: a face of its own
    with BuildSketch(Plane.YZ.offset(SCALE1_START_4)):
        Polygon((272.856582556, -140.808207452), (264.901011821, -132.853875658), (256.946680027, -140.809446393), (264.902250762, -148.763778186), align=None)
    extrude(amount=SCALE1_5_DEPTH)


with BuildPart() as part_4:
    add(part_3.part)

    # Scale1 5: cut by scale1_5_tool
    add(scale1_5_tool.part, mode=Mode.SUBTRACT)


with BuildPart() as body_3_5:
    add(body_3_4.part)

    # Scale1 5: cut by scale1_5_tool
    add(scale1_5_tool.part, mode=Mode.SUBTRACT)

    # Scale1 6 outline → Scale1 6 (cut)
    with BuildSketch(Plane.YZ.offset(SCALE1_START)):
        Polygon((9, -534.787278323), (9, -384.787278323), (-9, -384.787278323), (-9, -534.787278323), (-39, -534.787278323), (-39, -540.787278323), (39, -540.787278323), (39, -534.787278323), align=None)
    extrude(amount=SCALE1_6_DEPTH, mode=Mode.SUBTRACT)


with BuildPart() as body_3_2_5:
    add(body_3_2_4.part)

    # Scale1 5: cut by scale1_5_tool
    add(scale1_5_tool.part, mode=Mode.SUBTRACT)


with BuildPart() as body_4_3:
    add(body_4_2.part)

    # Scale1 5: cut by scale1_5_tool
    add(scale1_5_tool.part, mode=Mode.SUBTRACT)


with BuildPart() as scale1_8_tool:
    # Scale1 8 outline → Scale1 8 (new body)
    # profile 1 of 2: a face of its own
    with BuildSketch(Plane.YZ.offset(SCALE1_START_6)):
        with BuildLine():
            Line((428.787405034, 486.817615974), (382.284389256, 524.73159128))
            ThreePointArc((382.284389256, 524.73159128), (373.842690147, 523.872687233), (374.701594195, 515.430988124))
            Line((374.701594195, 515.430988124), (421.204609973, 477.517012818))
            ThreePointArc((421.204609973, 477.517012818), (429.646309082, 478.375916865), (428.787405034, 486.817615974))
        make_face()
        with Locations((378.492991725, 520.081289702)):
            Circle(SCALE1_8_OUTLINE_R, mode=Mode.SUBTRACT)
        with Locations((424.996007504, 482.167314396)):
            Circle(SCALE1_8_OUTLINE_R, mode=Mode.SUBTRACT)
    # profile 2 of 2: a face of its own
    with BuildSketch(Plane.YZ.offset(SCALE1_START_6)):
        Polygon((272.856582556, -140.808207452), (264.901011821, -132.853875658), (256.946680027, -140.809446393), (264.902250762, -148.763778186), align=None)
    extrude(amount=SCALE1_8_DEPTH)


with BuildPart() as body_3_2_6:
    add(body_3_2_5.part)

    # Scale1 8: cut by scale1_8_tool
    add(scale1_8_tool.part, mode=Mode.SUBTRACT)


with BuildPart() as body_4_4:
    add(body_4_3.part)

    # Scale1 8: cut by scale1_8_tool
    add(scale1_8_tool.part, mode=Mode.SUBTRACT)


with BuildPart() as body_5_4:
    add(body_5_3.part)

    # Scale1 8: cut by scale1_8_tool
    add(scale1_8_tool.part, mode=Mode.SUBTRACT)


with BuildPart() as body_7_4:
    add(body_7_3.part)

    # Scale1 8: cut by scale1_8_tool
    add(scale1_8_tool.part, mode=Mode.SUBTRACT)


with BuildPart() as scale1_9_tool:
    # Scale1 9 outline → Scale1 9 (new body)
    with BuildSketch(Plane.YZ.offset(SCALE1_START_7)):
        with Locations((0, -400.942278323)):
            Circle(SCALE1_9_OUTLINE_R)
        with Locations((378.492991725, 520.081289702)):
            Circle(SCALE1_9_OUTLINE_R)
        with Locations((424.996007504, 482.167314396)):
            Circle(SCALE1_9_OUTLINE_R)
    extrude(amount=SCALE1_9_DEPTH)


with BuildPart() as part_5:
    add(part_4.part)

    # Scale1 9: cut by scale1_9_tool
    add(scale1_9_tool.part, mode=Mode.SUBTRACT)


with BuildPart() as body_3_6:
    add(body_3_5.part)

    # Scale1 9: cut by scale1_9_tool
    add(scale1_9_tool.part, mode=Mode.SUBTRACT)


with BuildPart() as body_5_5:
    add(body_5_4.part)

    # Scale1 9: cut by scale1_9_tool
    add(scale1_9_tool.part, mode=Mode.SUBTRACT)


with BuildPart() as body_7_5:
    add(body_7_4.part)

    # Scale1 9: cut by scale1_9_tool
    add(scale1_9_tool.part, mode=Mode.SUBTRACT)


with BuildPart() as scale1_10_tool:
    # Scale1 10 outline → Scale1 10 (new body)
    # profile 1 of 2: a face of its own
    with BuildSketch(Plane.YZ.offset(SCALE1_START_8)):
        Polygon((272.856582556, -140.808207452), (264.901011821, -132.853875658), (256.946680027, -140.809446393), (264.902250762, -148.763778186), align=None)
        with Locations((264.901631291, -140.808826922)):
            Circle(SCALE1_10_OUTLINE_R, mode=Mode.SUBTRACT)
    # profile 2 of 2: a face of its own
    with BuildSketch(Plane.YZ.offset(SCALE1_START_8)):
        with Locations((0, -520.942278323)):
            Circle(SCALE1_10_OUTLINE_R)
    extrude(amount=SCALE1_10_DEPTH)


with BuildPart() as body_3_7:
    add(body_3_6.part)

    # Scale1 10: cut by scale1_10_tool
    add(scale1_10_tool.part, mode=Mode.SUBTRACT)


with BuildPart() as body_3_2_7:
    add(body_3_2_6.part)

    # Scale1 10: cut by scale1_10_tool
    add(scale1_10_tool.part, mode=Mode.SUBTRACT)


with BuildPart() as body_4_5:
    add(body_4_4.part)

    # Scale1 10: cut by scale1_10_tool
    add(scale1_10_tool.part, mode=Mode.SUBTRACT)


with BuildPart() as body_6_4:
    add(body_6_3.part)

    add(body_5_5.part)  # Scale1 11 merges body 5

    add(body_7_5.part)  # Scale1 11 merges body 7

    add(body_4_5.part)  # Scale1 11 merges body 4

    add(part_5.part)  # Scale1 11 merges part

    add(body_3_2_7.part)  # Scale1 11 merges body 3 2

    add(body_3_7.part)  # Scale1 11 merges body 3
    # Scale1 11 outline → Scale1 11 (add)
    with BuildSketch(Plane.YZ.offset(SCALE1_START_9)):
        with BuildLine():
            Line((309.967810349, -119.703910751), (305.744043776, -128.615999648))
            Line((305.744043776, -128.615999648), (317.934639719, -140.804697119))
            Line((317.934639719, -140.804697119), (312.796549305, -145.943587825))
            Line((312.796549305, -145.943587825), (315.580759627, -147.263127456))
            Line((315.580759627, -147.263127456), (251.339849756, -282.810556421))
            Line((251.339849756, -282.810556421), (241.173792584, -277.992488181))
            Line((241.173792584, -277.992488181), (295.61002827, -163.132785777))
            Line((295.61002827, -163.132785777), (283.77564868, -174.969008652))
            Line((283.77564868, -174.969008652), (226.454627517, -295.915568405))
            ThreePointArc((226.454627517, -295.915568405), (231.802616449, -310.899693818), (246.786741862, -305.551704886))
            Line((246.786741862, -305.551704886), (330.299924693, -129.340047231))
            ThreePointArc((330.299924693, -129.340047231), (324.951935761, -114.355921819), (309.967810349, -119.703910751))
        make_face()
        with Locations((236.620684689, -300.733636646)):
            Circle(SCALE1_11_OUTLINE_R, mode=Mode.SUBTRACT)
        with Locations((320.133867521, -124.521978991)):
            Circle(SCALE1_11_OUTLINE_R, mode=Mode.SUBTRACT)
    extrude(amount=SCALE1_11_DEPTH)


solid = body_6_4.part
